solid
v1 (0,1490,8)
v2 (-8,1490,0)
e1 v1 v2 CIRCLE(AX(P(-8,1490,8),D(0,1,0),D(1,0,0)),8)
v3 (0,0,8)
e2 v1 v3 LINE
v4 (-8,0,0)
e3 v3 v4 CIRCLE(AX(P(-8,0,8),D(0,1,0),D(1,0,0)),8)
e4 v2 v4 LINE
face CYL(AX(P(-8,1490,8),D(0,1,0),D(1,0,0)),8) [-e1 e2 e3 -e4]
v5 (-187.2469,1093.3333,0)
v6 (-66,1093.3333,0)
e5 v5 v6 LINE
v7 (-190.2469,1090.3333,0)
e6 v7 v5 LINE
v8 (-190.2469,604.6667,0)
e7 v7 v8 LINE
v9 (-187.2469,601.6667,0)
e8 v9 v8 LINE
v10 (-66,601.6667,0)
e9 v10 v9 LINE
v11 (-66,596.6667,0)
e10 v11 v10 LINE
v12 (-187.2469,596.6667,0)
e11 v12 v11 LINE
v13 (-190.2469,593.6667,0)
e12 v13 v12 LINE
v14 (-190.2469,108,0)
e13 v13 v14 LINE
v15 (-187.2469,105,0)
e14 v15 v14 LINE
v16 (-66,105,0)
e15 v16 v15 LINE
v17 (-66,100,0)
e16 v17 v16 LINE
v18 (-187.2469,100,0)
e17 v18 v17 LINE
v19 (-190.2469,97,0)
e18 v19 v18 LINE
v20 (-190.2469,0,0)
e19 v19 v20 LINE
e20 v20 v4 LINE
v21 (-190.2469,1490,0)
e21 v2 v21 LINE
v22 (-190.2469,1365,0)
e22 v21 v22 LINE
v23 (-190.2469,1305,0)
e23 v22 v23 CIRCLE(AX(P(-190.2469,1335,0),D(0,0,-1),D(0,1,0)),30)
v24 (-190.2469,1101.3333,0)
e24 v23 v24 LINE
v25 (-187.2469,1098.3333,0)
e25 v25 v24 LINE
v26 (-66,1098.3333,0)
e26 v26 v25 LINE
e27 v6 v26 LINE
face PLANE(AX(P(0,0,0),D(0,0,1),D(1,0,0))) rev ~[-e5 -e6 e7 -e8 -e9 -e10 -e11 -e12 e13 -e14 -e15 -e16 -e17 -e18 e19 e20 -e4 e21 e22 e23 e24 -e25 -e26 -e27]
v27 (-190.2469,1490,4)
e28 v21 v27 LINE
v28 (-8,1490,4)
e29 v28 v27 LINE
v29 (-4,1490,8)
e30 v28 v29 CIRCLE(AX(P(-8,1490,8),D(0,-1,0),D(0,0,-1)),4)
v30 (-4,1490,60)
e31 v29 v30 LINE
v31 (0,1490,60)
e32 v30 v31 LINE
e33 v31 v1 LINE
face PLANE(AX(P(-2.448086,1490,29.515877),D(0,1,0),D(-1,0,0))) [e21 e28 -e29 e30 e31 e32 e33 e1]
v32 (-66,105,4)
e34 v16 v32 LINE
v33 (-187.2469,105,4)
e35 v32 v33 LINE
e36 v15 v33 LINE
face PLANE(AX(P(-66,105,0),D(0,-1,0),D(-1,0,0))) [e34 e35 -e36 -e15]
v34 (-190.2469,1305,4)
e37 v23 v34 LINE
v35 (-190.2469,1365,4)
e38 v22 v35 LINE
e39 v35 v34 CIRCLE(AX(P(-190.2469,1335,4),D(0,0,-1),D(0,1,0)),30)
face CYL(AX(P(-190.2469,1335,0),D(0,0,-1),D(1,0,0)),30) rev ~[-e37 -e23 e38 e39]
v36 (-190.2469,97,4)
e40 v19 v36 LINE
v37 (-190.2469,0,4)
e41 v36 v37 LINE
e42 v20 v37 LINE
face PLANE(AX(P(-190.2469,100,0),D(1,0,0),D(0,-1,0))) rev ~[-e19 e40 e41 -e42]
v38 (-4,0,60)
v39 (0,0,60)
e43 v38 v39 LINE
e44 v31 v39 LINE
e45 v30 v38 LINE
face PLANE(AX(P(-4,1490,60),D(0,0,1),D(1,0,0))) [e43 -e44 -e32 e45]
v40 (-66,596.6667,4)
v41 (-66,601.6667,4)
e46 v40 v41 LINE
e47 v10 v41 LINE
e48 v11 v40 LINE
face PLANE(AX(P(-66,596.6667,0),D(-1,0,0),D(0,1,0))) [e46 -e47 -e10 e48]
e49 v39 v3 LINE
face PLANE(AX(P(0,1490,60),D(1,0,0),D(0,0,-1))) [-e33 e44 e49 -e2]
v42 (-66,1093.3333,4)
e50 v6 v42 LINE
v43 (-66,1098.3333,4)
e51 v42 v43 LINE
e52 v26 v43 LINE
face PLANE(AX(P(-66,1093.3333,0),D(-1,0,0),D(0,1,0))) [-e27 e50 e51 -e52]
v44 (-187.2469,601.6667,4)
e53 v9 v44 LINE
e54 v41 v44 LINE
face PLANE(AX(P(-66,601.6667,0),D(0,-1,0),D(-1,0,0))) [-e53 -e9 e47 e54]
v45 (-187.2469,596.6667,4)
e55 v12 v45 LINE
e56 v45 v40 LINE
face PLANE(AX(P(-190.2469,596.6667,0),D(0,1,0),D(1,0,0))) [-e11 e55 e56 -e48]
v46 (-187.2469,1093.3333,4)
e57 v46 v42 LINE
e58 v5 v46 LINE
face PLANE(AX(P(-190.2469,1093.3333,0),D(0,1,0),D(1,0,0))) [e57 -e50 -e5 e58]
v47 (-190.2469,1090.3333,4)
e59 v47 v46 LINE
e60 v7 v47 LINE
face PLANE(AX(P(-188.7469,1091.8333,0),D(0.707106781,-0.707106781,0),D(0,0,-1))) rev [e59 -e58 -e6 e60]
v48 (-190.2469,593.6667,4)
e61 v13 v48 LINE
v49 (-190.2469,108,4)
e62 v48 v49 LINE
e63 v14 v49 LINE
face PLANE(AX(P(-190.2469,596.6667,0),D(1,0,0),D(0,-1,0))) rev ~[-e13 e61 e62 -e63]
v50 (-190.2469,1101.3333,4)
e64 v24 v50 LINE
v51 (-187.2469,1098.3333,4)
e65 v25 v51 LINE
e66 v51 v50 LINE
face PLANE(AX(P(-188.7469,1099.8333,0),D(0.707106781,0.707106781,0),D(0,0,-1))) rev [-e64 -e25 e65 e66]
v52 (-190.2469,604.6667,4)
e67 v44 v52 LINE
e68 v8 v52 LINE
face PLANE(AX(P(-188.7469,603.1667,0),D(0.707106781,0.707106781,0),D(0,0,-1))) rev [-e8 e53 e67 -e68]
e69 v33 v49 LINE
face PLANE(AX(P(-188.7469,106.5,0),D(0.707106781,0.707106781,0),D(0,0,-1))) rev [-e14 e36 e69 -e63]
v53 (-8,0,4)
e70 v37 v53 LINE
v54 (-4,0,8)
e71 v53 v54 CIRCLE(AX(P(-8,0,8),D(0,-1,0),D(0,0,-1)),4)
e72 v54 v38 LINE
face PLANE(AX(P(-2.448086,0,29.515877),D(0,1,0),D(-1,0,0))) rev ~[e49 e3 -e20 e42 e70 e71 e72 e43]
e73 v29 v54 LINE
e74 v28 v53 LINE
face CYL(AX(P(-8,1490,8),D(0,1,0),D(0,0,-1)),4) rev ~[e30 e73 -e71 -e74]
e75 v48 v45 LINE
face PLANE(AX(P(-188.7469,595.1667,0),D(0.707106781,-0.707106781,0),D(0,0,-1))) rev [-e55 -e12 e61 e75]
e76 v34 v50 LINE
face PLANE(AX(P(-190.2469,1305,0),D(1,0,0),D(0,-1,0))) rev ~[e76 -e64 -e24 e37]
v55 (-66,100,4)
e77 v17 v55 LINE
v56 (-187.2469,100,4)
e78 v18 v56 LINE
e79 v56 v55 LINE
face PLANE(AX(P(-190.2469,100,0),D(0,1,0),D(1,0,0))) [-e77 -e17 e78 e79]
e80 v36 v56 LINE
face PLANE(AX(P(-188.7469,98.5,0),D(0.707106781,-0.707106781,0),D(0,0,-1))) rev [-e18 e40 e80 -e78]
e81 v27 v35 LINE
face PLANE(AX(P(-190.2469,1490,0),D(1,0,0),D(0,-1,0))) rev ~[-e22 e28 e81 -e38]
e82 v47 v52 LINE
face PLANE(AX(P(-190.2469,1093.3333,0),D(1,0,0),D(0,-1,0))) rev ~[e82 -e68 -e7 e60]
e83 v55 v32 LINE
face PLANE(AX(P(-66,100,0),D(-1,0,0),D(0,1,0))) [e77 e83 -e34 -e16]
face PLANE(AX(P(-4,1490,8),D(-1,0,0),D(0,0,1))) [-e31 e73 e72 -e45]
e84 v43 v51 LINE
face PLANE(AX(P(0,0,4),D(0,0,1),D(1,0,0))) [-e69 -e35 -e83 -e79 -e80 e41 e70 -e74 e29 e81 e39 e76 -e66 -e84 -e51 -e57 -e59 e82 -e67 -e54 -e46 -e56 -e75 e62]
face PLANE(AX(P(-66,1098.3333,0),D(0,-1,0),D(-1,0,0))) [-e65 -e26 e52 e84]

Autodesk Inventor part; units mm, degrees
ref_plane "YZ Plane" through (0, 0, 0) normal (1, 0, 0) x (0, 1, 0)
ref_plane "XZ Plane" through (0, 0, 0) normal (0, 1, 0) x (-1, 0, 0)
ref_plane "XY Plane" through (0, 0, 0) normal (0, 0, 1) x (1, 0, 0)
sketch "Sketch1" plane through (0, 0, 0) normal (0, 0, 1) x (1, 0, 0)
  line L0 (0, 1490) -> (-190.2469, 1490)
  line L1 (-190.2469, 1490) -> (-190.2469, 0)
  line L2 (-190.2469, 0) -> (0, 0)
  line L3 (0, 0) -> (0, 1490)
  line L4 (-190.2469, 100) -> (-66, 100)
  line L5 (-66, 100) -> (-66, 105)
  line L6 (-66, 105) -> (-190.2469, 105)
  line L7 (-190.2469, 105) -> (-190.2469, 100)
  line L8 (-190.2469, 596.6667) -> (-66, 596.6667)
  line L9 (-66, 596.6667) -> (-66, 601.6667)
  line L10 (-66, 601.6667) -> (-190.2469, 601.6667)
  line L11 (-190.2469, 601.6667) -> (-190.2469, 596.6667)
  line L12 (-190.2469, 1093.3333) -> (-66, 1093.3333)
  line L13 (-66, 1093.3333) -> (-66, 1098.3333)
  line L14 (-66, 1098.3333) -> (-190.2469, 1098.3333)
  line L15 (-190.2469, 1098.3333) -> (-190.2469, 1093.3333)
  circle A0 centre (-190.2469, 1335) radius 30
  point P0 (-190.2469, 1098.3333)
  point P1 (-190.2469, 1093.3333)
  point P2 (-190.2469, 601.6667)
  point P3 (-190.2469, 596.6667)
  point P4 (-190.2469, 1365)
  point P5 (-190.2469, 1305)
  dimension "d0" = 1490
  dimension "d1" = 190.2469
  dimension "d2" = 5
  dimension "d4" = 100
  dimension "d7" = 496.6667
  dimension "d23" = 66
  dimension "d29" = 60
  dimension "d30" = 1335
extrude "Plate1" add sketch "Sketch1" along normal blind 4 contours L3 L2 L1 L4 L5 L6 L8 L9 L10 L12 L13 L14 A0 L0
sketch "Sketch2" plane through (-4, 1490, 0) normal (1, 0, 0) x (0, 1, 0)
  line L0 (-1490, 0) -> (0, 0)
  line L1 (0, 0) -> (0, 60)
  line L2 (0, 60) -> (-1490, 60)
  line L3 (-1490, 60) -> (-1490, 0)
edge flange "Flange1" height 60 angle 90 thickness 4 bend radius 4 thickness toward (1, 0, 0) relief tear relief width 4 relief depth 2 edges at (0, 745, 4) wall of the first edge with corners at (-4, 0, 0) (-4, 1490, 0) (-4, 1490, 60) (-4, 0, 60)
bend "Bend1"
corner "Corner1"
chamfer "Corner Chamfer1" distance 3 angle 45 6 edges at (-190.2469, 100, 2) (-190.2469, 105, 2) (-190.2469, 596.6667, 2) (-190.2469, 601.6667, 2) (-190.2469, 1098.3333, 2) (-190.2469, 1093.3333, 2)
equation "\"d0\" = Стрингер_длина"
equation "\"d1\" = стрингер_глубина_1"
equation "\"d2\" = паз_под_стрингер_толщина"
equation "\"d7\" = Шаг_шпангоутов"
equation "\"d23\" = паз_под_стрингер_глубина - Thickness"
equation "\"d29\" = 2 * радиус_выреза_под_сварку"
equation "\"d12\" = Thickness"
equation "\"d13\" = BendReliefWidth"
equation "\"d14\" = BendReliefDepth"
equation "\"d15\" = MinimumRemnant"
equation "\"d16\" = TransitionRadius"
equation "\"d17\" = ребро_усилителей"
equation "\"d19\" = BendRadius"
equation "\"d20\" = CornerReliefSize"
equation "\"d21\" = GapSize"
equation "\"d22\" = JacobiRadiusSize"
equation "\"BendRadius\" = Thickness"
equation "\"BendReliefWidth\" = Thickness"
equation "\"BendReliefDepth\" = 0.5 * Thickness"
equation "\"CornerReliefSize\" = 4 * Thickness"
equation "\"MinimumRemnant\" = 2 * Thickness"
equation "\"TransitionRadius\" = BendRadius"
equation "\"JacobiRadiusSize\" = BendRadius"
equation "\"GapSize\" = Thickness"
equation "\"Стрингер_длина\" = 1490"
equation "\"стрингер_глубина_1\" = 190.246925"
equation "\"паз_под_стрингер_толщина\" = 5"
equation "\"Шаг_шпангоутов\" = 496.666667"
equation "\"паз_под_стрингер_глубина\" = 70"
equation "\"Thickness\" = 4"
equation "\"радиус_выреза_под_сварку\" = 30"
equation "\"ребро_усилителей\" = 60"
properties part number "GBK 0102 stringer 1" material "Steel"
